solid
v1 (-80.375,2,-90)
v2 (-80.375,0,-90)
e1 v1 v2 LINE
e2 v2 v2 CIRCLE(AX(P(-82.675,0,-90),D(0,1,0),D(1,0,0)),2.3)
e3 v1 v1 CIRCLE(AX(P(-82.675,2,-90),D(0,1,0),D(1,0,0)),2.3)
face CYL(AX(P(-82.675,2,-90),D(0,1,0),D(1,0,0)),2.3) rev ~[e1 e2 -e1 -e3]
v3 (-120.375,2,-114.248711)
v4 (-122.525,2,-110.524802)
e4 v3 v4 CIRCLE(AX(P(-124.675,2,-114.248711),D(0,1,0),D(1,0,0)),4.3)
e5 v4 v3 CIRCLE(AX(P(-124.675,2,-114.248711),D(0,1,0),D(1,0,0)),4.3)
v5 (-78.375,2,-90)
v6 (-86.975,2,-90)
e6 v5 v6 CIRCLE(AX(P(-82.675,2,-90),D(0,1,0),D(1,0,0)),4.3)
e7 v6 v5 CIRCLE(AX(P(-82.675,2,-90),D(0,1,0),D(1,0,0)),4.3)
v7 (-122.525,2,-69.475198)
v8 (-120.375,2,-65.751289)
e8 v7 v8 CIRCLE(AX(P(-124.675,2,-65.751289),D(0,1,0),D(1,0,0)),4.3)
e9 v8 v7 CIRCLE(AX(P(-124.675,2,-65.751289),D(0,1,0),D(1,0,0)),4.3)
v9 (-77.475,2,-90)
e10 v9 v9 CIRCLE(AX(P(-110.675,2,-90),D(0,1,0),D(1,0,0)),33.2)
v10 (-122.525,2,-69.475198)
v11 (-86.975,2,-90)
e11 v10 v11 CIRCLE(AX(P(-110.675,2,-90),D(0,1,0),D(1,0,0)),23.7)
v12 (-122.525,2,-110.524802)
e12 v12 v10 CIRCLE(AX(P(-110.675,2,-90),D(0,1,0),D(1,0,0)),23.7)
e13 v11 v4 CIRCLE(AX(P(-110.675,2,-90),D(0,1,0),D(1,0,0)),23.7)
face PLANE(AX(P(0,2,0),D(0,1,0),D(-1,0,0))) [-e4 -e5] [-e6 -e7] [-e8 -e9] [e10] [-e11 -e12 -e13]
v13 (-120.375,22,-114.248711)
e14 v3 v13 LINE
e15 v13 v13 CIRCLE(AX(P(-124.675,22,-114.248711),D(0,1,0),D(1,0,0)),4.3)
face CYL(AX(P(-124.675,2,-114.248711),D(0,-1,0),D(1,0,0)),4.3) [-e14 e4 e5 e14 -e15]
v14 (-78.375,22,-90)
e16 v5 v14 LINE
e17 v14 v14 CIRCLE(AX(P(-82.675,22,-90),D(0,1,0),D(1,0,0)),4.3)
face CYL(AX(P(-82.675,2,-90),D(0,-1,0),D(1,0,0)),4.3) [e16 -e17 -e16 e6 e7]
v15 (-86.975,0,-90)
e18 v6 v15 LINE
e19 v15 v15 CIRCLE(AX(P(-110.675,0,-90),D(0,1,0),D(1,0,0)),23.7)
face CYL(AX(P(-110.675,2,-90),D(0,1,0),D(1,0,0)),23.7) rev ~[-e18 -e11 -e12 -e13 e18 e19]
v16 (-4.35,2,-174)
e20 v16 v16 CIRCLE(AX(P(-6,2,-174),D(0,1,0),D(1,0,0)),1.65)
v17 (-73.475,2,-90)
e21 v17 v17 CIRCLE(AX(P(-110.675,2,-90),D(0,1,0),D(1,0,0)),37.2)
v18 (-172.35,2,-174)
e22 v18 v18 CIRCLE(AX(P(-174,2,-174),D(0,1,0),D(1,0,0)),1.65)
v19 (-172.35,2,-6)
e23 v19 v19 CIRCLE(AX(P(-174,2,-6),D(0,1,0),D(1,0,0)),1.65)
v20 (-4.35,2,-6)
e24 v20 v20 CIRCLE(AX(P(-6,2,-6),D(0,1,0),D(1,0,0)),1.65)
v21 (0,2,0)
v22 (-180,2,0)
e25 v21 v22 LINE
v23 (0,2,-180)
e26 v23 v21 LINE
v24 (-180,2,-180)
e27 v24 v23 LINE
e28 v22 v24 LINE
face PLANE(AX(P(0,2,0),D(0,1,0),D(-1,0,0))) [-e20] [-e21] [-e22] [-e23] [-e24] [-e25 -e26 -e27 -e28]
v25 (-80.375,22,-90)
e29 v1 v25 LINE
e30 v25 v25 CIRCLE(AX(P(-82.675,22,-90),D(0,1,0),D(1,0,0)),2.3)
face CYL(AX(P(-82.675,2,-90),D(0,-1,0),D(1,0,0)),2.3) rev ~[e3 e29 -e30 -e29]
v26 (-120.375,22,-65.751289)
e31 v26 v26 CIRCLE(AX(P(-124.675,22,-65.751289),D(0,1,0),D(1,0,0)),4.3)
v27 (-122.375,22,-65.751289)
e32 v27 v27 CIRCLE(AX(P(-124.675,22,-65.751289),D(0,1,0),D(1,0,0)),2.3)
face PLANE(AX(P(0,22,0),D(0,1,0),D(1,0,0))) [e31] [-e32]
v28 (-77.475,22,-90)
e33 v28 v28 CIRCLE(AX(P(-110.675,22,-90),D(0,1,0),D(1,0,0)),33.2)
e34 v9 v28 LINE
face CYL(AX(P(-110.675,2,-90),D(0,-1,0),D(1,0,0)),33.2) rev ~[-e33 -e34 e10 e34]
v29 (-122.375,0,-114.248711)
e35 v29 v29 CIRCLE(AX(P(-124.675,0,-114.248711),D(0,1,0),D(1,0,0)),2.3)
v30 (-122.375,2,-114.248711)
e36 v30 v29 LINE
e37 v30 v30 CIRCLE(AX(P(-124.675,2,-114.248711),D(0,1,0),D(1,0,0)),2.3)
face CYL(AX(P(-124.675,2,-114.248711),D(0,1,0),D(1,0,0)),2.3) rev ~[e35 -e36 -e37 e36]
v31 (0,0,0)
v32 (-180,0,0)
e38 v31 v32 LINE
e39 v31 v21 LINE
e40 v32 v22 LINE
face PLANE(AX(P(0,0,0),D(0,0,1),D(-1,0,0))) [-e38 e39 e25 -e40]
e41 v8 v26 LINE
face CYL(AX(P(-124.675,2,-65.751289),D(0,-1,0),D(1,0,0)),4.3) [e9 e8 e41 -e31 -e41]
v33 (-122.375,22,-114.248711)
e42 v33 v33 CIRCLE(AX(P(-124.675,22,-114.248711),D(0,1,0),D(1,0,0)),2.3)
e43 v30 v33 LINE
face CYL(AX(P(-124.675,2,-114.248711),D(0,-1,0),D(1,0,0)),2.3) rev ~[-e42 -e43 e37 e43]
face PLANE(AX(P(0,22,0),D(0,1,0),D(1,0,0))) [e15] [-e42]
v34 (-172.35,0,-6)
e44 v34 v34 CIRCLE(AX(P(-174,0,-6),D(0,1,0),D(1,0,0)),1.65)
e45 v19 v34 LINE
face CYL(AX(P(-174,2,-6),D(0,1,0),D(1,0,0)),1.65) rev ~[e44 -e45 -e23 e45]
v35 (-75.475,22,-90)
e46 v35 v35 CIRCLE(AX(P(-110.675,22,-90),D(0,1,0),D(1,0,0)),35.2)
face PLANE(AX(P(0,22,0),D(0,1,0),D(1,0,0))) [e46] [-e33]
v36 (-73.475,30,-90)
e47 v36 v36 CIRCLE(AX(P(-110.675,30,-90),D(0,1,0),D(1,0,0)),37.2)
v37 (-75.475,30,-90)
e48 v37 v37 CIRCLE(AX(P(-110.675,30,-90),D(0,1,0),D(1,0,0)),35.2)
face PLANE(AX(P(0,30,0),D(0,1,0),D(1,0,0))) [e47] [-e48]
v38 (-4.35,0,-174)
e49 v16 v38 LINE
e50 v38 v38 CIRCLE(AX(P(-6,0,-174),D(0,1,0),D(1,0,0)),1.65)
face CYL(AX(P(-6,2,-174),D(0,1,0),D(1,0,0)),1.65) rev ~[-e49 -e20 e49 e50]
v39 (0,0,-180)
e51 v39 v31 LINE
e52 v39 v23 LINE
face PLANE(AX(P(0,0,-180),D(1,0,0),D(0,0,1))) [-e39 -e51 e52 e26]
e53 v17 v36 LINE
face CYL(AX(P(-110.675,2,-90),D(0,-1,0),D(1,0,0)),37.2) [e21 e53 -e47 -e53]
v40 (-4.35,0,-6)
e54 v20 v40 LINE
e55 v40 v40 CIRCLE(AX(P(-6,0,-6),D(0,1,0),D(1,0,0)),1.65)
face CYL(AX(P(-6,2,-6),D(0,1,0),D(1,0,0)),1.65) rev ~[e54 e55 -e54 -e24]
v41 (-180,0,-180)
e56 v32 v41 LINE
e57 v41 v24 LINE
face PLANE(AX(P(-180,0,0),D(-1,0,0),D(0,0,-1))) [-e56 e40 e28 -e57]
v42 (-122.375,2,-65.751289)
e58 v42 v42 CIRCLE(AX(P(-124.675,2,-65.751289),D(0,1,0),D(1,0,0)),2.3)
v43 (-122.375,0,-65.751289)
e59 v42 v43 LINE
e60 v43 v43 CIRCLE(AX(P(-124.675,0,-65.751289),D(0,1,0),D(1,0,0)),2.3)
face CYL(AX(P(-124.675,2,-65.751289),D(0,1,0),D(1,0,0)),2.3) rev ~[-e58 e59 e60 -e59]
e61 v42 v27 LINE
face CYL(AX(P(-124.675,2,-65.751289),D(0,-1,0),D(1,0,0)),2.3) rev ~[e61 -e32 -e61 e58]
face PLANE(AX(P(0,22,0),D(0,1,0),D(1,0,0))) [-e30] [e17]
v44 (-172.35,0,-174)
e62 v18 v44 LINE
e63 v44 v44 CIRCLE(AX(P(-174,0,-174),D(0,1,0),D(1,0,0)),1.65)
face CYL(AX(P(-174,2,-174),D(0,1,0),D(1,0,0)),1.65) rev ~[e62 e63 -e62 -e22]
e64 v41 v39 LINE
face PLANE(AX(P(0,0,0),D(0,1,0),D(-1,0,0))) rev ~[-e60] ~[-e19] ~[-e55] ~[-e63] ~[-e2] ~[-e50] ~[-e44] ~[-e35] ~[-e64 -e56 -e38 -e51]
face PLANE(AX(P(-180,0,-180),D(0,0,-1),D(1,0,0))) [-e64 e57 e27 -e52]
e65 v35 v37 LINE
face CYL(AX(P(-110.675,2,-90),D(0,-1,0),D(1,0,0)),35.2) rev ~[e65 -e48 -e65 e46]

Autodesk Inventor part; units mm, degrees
ref_plane "YZ Plane" through (0, 0, 0) normal (1, 0, 0) x (0, 1, 0)
ref_plane "XZ Plane" through (0, 0, 0) normal (0, 1, 0) x (-1, 0, 0)
ref_plane "XY Plane" through (0, 0, 0) normal (0, 0, 1) x (1, 0, 0)
sketch "Sketch1" plane through (0, 0, 0) normal (0, 1, 0) x (-1, 0, 0)
  line L0 (0, 0) -> (180, 0)
  line L1 (180, 0) -> (180, -180)
  line L2 (180, -180) -> (0, -180)
  line L3 (0, -180) -> (0, 0)
  dimension "d0" = 180
  dimension "d1" = 180
extrude "Extrusion1" add sketch "Sketch1" along normal blind 2
sketch "Sketch3" plane through (0, 2, 0) normal (0, 1, 0) x (1, 0, 0)
  circle A0 centre (-174, 6) radius 1.65
  circle A1 centre (-174, 174) radius 1.65
  circle A2 centre (-6, 174) radius 1.65
  circle A3 centre (-6, 6) radius 1.65
  point P0 (0, 0)
  dimension "d9" = 3.3
  dimension "d10" = 3.3
  dimension "d11" = 3.3
  dimension "d12" = 3.3
extrude "Extrusion3" cut sketch "Sketch3" against normal through all
sketch "Sketch10" plane through (0, 2, 0) normal (0, 1, 0) x (1, 0, 0)
  line L0 (0, 180) -> (-180, 180)
  circle A0 centre (-110.675, 90) radius 35.2
  circle A1 centre (-110.675, 90) radius 37.2
  circle A2 centre (-110.675, 90) radius 28 construction
  line L1 (-110.675, 90) -> (-73.475, 90) construction
  line L2 (-110.675, 90) -> (-129.275, 122.216145) construction
  line L3 (-90.675, 90) -> (-53.475, 90) construction
  line L4 (-110.675, 90) -> (-129.275, 57.783855) construction
  line L5 (-90.675, 90) -> (-53.475, 90) construction
  circle A3 centre (-124.675, 114.248711) radius 2.3
  circle A4 centre (-124.675, 114.248711) radius 4.3
  circle A5 centre (-124.675, 65.751289) radius 2.3
  circle A6 centre (-124.675, 65.751289) radius 4.3
  circle A7 centre (-82.675, 90) radius 2.3
  circle A8 centre (-82.675, 90) radius 4.3
  circle A9 centre (-110.675, 90) radius 33.2
  circle A10 centre (-110.675, 90) radius 23.7
  point P0 (0, 0)
  dimension "d68" = 70.4
  dimension "d69" = 74.4
  dimension "d70" = 56
  dimension "d71" = 120
  dimension "d72" = 120
  dimension "d73" = 4.6
  dimension "d74" = 8.6
  dimension "d75" = 4.6
  dimension "d76" = 8.6
  dimension "d77" = 4.6
  dimension "d78" = 8.6
  dimension "d79" = 66.4
  dimension "d88" = 47.4
sketch "Sketch10 outline for Extrusion11" plane through (0, 2, 0) normal (0, 1, 0) x (1, 0, 0)
  circle A0 centre (-110.675, 90) radius 35.2
  circle A1 centre (-110.675, 90) radius 33.2
  circle A2 centre (-82.675, 90) radius 4.3
  circle A3 centre (-82.675, 90) radius 2.3
  circle A4 centre (-124.675, 65.751289) radius 4.3
  circle A5 centre (-124.675, 65.751289) radius 2.3
  circle A6 centre (-124.675, 114.248711) radius 4.3
  circle A7 centre (-124.675, 114.248711) radius 2.3
extrude "Extrusion11" add sketch "Sketch10 outline for Extrusion11" along normal blind 20
sketch "Sketch10 outline for Extrusion12" plane through (0, 2, 0) normal (0, 1, 0) x (1, 0, 0)
  circle A0 centre (-110.675, 90) radius 37.2
  circle A1 centre (-110.675, 90) radius 35.2
extrude "Extrusion12" add sketch "Sketch10 outline for Extrusion12" along normal blind 28
sketch "Sketch10 outline for Extrusion13" plane through (0, 2, 0) normal (0, 1, 0) x (1, 0, 0)
  circle A0 centre (-110.675, 90) radius 23.7
extrude "Extrusion13" cut sketch "Sketch10 outline for Extrusion13" against normal through all
sketch "Sketch10 outline for Extrusion14" plane through (0, 2, 0) normal (0, 1, 0) x (1, 0, 0)
  circle A0 centre (-124.675, 114.248711) radius 2.3
  circle A1 centre (-124.675, 65.751289) radius 2.3
  circle A2 centre (-82.675, 90) radius 2.3
extrude "Extrusion14" cut sketch "Sketch10 outline for Extrusion14" against normal through all
properties part number "top plate"
